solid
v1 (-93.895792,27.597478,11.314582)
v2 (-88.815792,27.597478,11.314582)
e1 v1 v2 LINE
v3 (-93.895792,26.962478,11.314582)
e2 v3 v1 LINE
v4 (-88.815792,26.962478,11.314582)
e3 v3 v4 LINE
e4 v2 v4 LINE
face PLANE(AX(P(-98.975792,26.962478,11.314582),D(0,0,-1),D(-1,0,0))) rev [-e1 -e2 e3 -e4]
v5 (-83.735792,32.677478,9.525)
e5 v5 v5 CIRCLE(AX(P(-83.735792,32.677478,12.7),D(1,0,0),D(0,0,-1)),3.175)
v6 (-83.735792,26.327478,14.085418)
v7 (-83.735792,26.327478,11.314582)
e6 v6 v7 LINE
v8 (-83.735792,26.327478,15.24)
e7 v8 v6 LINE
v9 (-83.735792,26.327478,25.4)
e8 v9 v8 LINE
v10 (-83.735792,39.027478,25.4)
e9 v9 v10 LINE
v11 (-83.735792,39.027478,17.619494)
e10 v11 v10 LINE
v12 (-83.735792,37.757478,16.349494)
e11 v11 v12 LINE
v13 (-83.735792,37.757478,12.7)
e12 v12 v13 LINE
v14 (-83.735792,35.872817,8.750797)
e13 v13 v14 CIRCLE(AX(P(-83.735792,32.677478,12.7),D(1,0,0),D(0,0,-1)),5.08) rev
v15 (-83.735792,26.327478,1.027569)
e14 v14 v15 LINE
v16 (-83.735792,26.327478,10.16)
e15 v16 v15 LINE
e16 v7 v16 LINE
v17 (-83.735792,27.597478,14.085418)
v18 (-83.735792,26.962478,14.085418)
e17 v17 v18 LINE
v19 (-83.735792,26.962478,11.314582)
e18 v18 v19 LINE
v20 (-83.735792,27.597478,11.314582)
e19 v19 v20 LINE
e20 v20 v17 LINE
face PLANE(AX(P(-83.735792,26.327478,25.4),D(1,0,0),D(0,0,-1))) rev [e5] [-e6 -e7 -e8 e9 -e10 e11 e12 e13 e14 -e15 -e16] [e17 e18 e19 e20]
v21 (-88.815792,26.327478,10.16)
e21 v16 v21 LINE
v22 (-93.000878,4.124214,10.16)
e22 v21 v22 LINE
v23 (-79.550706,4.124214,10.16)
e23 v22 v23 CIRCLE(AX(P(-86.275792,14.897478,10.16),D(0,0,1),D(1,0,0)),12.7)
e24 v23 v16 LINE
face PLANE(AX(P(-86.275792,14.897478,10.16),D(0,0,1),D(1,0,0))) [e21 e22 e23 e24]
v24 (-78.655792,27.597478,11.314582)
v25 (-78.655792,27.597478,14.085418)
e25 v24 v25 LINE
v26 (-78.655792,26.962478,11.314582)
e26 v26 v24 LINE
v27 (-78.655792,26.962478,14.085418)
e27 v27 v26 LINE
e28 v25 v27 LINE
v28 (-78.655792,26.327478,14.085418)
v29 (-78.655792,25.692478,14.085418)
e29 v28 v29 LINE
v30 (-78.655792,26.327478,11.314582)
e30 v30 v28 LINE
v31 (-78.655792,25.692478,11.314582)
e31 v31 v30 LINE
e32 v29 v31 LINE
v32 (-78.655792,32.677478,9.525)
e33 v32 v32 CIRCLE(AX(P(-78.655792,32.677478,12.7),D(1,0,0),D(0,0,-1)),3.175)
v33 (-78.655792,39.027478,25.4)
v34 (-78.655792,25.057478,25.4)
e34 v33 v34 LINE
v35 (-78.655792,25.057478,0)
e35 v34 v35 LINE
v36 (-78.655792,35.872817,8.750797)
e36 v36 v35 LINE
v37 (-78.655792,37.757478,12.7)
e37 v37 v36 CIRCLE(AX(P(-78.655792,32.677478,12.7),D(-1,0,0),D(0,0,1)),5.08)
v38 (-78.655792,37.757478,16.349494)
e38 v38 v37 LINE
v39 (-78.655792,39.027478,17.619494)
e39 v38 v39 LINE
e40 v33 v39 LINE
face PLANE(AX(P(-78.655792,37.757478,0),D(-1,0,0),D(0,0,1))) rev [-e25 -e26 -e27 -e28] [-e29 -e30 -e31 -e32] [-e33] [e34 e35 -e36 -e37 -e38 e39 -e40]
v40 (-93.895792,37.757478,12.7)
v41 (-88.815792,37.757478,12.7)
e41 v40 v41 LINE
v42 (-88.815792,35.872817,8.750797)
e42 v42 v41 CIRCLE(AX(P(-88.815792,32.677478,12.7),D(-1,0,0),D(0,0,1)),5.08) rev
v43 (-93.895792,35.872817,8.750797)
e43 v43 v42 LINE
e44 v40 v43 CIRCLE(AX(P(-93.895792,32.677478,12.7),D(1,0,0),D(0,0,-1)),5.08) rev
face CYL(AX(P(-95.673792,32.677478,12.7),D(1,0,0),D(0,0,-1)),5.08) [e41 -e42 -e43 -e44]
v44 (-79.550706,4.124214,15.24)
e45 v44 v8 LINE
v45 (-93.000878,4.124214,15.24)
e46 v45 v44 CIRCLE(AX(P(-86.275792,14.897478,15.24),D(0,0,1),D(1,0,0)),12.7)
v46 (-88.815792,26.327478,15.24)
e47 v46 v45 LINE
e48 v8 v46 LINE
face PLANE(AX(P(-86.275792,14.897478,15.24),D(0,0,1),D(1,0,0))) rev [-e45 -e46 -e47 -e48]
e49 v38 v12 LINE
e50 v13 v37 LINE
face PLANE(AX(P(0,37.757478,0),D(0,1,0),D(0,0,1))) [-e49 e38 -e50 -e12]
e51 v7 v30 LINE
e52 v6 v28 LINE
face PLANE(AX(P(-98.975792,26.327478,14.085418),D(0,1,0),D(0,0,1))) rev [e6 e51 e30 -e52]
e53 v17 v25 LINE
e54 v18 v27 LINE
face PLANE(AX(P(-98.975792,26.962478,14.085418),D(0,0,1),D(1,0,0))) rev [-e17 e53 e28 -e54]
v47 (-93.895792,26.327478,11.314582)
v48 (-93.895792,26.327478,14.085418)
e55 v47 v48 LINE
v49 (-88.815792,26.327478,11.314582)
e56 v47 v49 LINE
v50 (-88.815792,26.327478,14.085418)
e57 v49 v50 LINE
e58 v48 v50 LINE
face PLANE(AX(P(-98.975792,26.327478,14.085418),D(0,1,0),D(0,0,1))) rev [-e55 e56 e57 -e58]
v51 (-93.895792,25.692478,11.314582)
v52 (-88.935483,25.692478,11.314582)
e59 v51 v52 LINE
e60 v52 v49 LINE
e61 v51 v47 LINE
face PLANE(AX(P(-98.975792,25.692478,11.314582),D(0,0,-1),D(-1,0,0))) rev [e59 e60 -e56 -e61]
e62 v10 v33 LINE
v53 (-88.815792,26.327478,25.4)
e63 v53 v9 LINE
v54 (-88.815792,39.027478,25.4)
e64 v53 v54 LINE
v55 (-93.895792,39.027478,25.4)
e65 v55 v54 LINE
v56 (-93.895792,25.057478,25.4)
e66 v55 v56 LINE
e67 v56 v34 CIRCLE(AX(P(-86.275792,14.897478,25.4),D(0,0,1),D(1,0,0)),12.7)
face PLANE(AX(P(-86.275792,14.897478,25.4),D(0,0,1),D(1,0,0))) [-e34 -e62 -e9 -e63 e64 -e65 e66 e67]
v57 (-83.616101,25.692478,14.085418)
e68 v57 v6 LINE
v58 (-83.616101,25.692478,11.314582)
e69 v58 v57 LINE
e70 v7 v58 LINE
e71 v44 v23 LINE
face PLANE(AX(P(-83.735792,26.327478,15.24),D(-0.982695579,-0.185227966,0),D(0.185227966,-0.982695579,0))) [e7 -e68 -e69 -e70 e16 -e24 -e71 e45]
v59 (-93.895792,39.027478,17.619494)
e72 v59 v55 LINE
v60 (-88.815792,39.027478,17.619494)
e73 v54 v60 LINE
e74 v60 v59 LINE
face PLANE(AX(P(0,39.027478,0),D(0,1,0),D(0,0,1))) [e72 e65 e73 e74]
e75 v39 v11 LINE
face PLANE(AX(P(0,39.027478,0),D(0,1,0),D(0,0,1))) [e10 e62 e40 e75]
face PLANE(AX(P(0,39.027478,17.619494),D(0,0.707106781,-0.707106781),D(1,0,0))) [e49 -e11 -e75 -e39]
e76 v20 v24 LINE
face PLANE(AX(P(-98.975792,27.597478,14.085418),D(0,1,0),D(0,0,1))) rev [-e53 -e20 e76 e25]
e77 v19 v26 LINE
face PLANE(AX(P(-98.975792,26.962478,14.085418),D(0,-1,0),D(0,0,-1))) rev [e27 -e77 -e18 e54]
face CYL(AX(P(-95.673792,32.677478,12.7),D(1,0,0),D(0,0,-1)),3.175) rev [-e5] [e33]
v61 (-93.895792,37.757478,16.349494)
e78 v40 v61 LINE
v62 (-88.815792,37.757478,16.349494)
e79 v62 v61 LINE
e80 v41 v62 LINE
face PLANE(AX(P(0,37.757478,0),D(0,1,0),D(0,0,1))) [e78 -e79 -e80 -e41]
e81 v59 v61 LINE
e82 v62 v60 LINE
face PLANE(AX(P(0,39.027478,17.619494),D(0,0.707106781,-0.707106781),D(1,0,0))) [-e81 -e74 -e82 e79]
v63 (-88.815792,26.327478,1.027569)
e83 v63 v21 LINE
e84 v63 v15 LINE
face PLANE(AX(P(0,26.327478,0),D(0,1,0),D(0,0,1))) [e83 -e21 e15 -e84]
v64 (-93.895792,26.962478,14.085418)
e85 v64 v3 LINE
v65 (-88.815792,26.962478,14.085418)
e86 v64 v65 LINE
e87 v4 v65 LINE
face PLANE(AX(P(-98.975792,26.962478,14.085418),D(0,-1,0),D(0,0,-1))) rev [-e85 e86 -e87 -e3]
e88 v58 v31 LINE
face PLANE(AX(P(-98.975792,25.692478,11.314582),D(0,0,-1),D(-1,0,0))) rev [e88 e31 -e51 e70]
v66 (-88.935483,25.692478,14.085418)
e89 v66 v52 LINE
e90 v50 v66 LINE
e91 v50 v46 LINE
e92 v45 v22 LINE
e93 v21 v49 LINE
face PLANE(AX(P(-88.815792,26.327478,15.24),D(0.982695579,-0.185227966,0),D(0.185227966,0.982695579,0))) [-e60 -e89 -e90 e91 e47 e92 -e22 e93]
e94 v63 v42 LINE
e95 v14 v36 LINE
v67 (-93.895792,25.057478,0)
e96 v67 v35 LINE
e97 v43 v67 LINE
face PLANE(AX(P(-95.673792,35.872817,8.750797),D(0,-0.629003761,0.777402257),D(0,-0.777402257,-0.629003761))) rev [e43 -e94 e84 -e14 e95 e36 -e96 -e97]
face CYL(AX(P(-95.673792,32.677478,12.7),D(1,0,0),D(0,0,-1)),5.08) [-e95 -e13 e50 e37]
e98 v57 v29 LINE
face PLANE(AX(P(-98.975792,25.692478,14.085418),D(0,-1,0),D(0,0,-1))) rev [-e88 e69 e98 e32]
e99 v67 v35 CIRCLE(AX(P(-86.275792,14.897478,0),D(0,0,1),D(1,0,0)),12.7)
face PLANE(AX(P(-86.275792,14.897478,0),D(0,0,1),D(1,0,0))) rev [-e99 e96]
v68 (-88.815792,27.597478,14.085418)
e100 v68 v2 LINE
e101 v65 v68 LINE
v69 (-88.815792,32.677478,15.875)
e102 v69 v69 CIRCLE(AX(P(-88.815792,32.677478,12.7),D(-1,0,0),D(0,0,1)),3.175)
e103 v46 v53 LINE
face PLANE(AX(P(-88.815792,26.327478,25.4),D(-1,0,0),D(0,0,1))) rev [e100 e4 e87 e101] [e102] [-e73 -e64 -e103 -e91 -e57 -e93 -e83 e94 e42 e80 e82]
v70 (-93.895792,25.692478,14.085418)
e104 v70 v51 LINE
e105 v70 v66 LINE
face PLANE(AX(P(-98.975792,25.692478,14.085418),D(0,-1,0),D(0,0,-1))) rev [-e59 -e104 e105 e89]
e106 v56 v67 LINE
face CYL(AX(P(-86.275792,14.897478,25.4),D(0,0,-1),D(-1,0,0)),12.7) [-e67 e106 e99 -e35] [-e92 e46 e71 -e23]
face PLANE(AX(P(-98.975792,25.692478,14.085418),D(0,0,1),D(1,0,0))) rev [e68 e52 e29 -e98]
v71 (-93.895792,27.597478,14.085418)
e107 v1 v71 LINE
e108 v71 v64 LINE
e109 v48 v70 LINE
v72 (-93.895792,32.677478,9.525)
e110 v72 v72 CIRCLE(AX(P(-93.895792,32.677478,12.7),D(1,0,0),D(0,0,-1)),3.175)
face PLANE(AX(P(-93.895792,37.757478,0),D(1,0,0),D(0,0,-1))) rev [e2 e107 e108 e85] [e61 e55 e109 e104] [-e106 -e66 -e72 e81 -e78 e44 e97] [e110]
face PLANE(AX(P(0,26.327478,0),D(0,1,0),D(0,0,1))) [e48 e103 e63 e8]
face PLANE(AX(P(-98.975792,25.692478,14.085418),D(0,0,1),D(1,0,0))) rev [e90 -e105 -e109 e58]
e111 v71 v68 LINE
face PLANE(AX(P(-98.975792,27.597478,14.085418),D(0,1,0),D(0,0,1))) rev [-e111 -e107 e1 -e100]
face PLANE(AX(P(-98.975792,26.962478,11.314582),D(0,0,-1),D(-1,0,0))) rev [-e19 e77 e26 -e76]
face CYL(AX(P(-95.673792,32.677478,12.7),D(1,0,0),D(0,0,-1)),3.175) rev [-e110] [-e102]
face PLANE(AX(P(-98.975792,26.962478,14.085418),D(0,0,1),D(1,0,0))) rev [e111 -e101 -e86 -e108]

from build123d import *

# Parameters (mm, degrees)
BOSS_EXTRUDE2_DEPTH     = 25.4
SKETCH5_W               = 15.24
SKETCH5_H               = 25.4
BOSS_EXTRUDE3_DEPTH     = 12.7
SKETCH7_W               = 5.08
SKETCH7_H               = 25.4
CUT_EXTRUDE1_DEPTH      = 11.43
SKETCH8_R               = 3.175
CUT_EXTRUDE2_DEPTH      = 17.018
SKETCH9_R               = 2.54
CUT_EXTRUDE3_DEPTH      = 105.993449126
SKETCH10_W              = 5.08
SKETCH10_H              = 9.050505722
BOSS_EXTRUDE4_DEPTH     = 1.27
CHAMFER1_SIZE           = 1.27
CUT_EXTRUDE4_DEPTH      = 2.54
CUT_EXTRUDE4_DEPTH_BACK = 2.54
SKETCH12_W              = 2.770836572
SKETCH12_H              = 0.635
CUT_EXTRUDE5_DEPTH      = 51.805574613


with BuildPart() as part:
    # Sketch1 → Boss-Extrude2 (new body)
    with BuildSketch(Plane.XY):
        with BuildLine():
            Line((-93.89579229, 25.057477651), (-78.65579229, 25.057477651))
            ThreePointArc((-78.65579229, 25.057477651), (-86.27579229, 2.197477651), (-93.89579229, 25.057477651))
        make_face()
    extrude(amount=BOSS_EXTRUDE2_DEPTH)

    # Sketch5 → Boss-Extrude3 (add)
    with BuildSketch(Plane(origin=(0, 25.057477651, 0), x_dir=(1, 0, 0), z_dir=(0, 1, 0))):
        with Locations((-86.27579229, -12.7)):
            Rectangle(SKETCH5_W, SKETCH5_H)
    extrude(amount=BOSS_EXTRUDE3_DEPTH)

    # Sketch7 → Cut-Extrude1 (cut)
    with BuildSketch(Plane(origin=(0, 37.757477651, 0), x_dir=(1, 0, 0), z_dir=(0, 1, 0))):
        with Locations((-86.27579229, -12.7)):
            Rectangle(SKETCH7_W, SKETCH7_H)
    extrude(amount=-CUT_EXTRUDE1_DEPTH, mode=Mode.SUBTRACT)

    # Sketch8 → Cut-Extrude2 (cut)
    with BuildSketch(Plane(origin=(-78.65579229, 0, 0), x_dir=(0, 0, -1), z_dir=(1, 0, 0))):
        with Locations((-12.7, 32.677477651)):
            Circle(SKETCH8_R)
        with BuildLine():
            Line((-12.7, 37.757477651), (0, 37.757477651))
            Line((0, 37.757477651), (0, 25.057477651))
            Line((0, 25.057477651), (-8.750796536, 35.872816757))
            ThreePointArc((-8.750796536, 35.872816757), (-10.512069775, 37.262165353), (-12.7, 37.757477651))
        make_face()
    extrude(amount=-CUT_EXTRUDE2_DEPTH, mode=Mode.SUBTRACT)

    # Sketch9 → Cut-Extrude3 (cut, through all)
    with BuildSketch(Plane(origin=(0, 26.327477651, 0), x_dir=(1, 0, 0), z_dir=(0, 1, 0))):
        with Locations(Location((-86.27579229, -12.7, 0), (0, 0, 270))):
            Circle(SKETCH9_R)
    extrude(amount=-CUT_EXTRUDE3_DEPTH, mode=Mode.SUBTRACT)

    # Sketch10 → Boss-Extrude4 (add)
    with BuildSketch(Plane(origin=(0, 37.757477651, 0), x_dir=(1, 0, 0), z_dir=(0, 1, 0))):
        with Locations((-91.35579229, -20.874747139)):
            Rectangle(SKETCH10_W, SKETCH10_H)
        with Locations((-81.19579229, -20.874747139)):
            Rectangle(SKETCH10_W, SKETCH10_H)
    extrude(amount=BOSS_EXTRUDE4_DEPTH)

    # Chamfer1
    chamfer1_edges = [part.edges().sort_by_distance(p)[0] for p in [
        (-81.19579229, 39.027477651, 16.349494278),
        (-91.35579229, 39.027477651, 16.349494278),
    ]]
    chamfer(chamfer1_edges, length=CHAMFER1_SIZE - 0.0001)  # a hair under: the kernel refuses the full size

    # Sketch11 → Cut-Extrude4 (cut, two sides: drawn at the far end of the back side and taken through both)
    with BuildSketch(Plane.XY.offset(12.7).offset(-CUT_EXTRUDE4_DEPTH_BACK)):
        with BuildLine():
            Line((-88.81579229, 26.327477651), (-93.000878218, 4.124213556))
            ThreePointArc((-93.000878218, 4.124213556), (-86.27579229, 2.197477651), (-79.550706362, 4.124213556))
            Line((-79.550706362, 4.124213556), (-83.73579229, 26.327477651))
            Line((-83.73579229, 26.327477651), (-88.81579229, 26.327477651))
        make_face()
    extrude(amount=CUT_EXTRUDE4_DEPTH + CUT_EXTRUDE4_DEPTH_BACK, mode=Mode.SUBTRACT)

    # Sketch12 → Cut-Extrude5 (cut, through all)
    with BuildSketch(Plane(origin=(-78.65579229, 0, 0), x_dir=(0, 0, -1), z_dir=(1, 0, 0))):
        with Locations((-12.7, 26.009977651)):
            Rectangle(SKETCH12_W, SKETCH12_H)
        with Locations((-12.7, 27.279977651)):
            Rectangle(SKETCH12_W, SKETCH12_H)
    extrude(amount=-CUT_EXTRUDE5_DEPTH, mode=Mode.SUBTRACT)


solid = part.part
